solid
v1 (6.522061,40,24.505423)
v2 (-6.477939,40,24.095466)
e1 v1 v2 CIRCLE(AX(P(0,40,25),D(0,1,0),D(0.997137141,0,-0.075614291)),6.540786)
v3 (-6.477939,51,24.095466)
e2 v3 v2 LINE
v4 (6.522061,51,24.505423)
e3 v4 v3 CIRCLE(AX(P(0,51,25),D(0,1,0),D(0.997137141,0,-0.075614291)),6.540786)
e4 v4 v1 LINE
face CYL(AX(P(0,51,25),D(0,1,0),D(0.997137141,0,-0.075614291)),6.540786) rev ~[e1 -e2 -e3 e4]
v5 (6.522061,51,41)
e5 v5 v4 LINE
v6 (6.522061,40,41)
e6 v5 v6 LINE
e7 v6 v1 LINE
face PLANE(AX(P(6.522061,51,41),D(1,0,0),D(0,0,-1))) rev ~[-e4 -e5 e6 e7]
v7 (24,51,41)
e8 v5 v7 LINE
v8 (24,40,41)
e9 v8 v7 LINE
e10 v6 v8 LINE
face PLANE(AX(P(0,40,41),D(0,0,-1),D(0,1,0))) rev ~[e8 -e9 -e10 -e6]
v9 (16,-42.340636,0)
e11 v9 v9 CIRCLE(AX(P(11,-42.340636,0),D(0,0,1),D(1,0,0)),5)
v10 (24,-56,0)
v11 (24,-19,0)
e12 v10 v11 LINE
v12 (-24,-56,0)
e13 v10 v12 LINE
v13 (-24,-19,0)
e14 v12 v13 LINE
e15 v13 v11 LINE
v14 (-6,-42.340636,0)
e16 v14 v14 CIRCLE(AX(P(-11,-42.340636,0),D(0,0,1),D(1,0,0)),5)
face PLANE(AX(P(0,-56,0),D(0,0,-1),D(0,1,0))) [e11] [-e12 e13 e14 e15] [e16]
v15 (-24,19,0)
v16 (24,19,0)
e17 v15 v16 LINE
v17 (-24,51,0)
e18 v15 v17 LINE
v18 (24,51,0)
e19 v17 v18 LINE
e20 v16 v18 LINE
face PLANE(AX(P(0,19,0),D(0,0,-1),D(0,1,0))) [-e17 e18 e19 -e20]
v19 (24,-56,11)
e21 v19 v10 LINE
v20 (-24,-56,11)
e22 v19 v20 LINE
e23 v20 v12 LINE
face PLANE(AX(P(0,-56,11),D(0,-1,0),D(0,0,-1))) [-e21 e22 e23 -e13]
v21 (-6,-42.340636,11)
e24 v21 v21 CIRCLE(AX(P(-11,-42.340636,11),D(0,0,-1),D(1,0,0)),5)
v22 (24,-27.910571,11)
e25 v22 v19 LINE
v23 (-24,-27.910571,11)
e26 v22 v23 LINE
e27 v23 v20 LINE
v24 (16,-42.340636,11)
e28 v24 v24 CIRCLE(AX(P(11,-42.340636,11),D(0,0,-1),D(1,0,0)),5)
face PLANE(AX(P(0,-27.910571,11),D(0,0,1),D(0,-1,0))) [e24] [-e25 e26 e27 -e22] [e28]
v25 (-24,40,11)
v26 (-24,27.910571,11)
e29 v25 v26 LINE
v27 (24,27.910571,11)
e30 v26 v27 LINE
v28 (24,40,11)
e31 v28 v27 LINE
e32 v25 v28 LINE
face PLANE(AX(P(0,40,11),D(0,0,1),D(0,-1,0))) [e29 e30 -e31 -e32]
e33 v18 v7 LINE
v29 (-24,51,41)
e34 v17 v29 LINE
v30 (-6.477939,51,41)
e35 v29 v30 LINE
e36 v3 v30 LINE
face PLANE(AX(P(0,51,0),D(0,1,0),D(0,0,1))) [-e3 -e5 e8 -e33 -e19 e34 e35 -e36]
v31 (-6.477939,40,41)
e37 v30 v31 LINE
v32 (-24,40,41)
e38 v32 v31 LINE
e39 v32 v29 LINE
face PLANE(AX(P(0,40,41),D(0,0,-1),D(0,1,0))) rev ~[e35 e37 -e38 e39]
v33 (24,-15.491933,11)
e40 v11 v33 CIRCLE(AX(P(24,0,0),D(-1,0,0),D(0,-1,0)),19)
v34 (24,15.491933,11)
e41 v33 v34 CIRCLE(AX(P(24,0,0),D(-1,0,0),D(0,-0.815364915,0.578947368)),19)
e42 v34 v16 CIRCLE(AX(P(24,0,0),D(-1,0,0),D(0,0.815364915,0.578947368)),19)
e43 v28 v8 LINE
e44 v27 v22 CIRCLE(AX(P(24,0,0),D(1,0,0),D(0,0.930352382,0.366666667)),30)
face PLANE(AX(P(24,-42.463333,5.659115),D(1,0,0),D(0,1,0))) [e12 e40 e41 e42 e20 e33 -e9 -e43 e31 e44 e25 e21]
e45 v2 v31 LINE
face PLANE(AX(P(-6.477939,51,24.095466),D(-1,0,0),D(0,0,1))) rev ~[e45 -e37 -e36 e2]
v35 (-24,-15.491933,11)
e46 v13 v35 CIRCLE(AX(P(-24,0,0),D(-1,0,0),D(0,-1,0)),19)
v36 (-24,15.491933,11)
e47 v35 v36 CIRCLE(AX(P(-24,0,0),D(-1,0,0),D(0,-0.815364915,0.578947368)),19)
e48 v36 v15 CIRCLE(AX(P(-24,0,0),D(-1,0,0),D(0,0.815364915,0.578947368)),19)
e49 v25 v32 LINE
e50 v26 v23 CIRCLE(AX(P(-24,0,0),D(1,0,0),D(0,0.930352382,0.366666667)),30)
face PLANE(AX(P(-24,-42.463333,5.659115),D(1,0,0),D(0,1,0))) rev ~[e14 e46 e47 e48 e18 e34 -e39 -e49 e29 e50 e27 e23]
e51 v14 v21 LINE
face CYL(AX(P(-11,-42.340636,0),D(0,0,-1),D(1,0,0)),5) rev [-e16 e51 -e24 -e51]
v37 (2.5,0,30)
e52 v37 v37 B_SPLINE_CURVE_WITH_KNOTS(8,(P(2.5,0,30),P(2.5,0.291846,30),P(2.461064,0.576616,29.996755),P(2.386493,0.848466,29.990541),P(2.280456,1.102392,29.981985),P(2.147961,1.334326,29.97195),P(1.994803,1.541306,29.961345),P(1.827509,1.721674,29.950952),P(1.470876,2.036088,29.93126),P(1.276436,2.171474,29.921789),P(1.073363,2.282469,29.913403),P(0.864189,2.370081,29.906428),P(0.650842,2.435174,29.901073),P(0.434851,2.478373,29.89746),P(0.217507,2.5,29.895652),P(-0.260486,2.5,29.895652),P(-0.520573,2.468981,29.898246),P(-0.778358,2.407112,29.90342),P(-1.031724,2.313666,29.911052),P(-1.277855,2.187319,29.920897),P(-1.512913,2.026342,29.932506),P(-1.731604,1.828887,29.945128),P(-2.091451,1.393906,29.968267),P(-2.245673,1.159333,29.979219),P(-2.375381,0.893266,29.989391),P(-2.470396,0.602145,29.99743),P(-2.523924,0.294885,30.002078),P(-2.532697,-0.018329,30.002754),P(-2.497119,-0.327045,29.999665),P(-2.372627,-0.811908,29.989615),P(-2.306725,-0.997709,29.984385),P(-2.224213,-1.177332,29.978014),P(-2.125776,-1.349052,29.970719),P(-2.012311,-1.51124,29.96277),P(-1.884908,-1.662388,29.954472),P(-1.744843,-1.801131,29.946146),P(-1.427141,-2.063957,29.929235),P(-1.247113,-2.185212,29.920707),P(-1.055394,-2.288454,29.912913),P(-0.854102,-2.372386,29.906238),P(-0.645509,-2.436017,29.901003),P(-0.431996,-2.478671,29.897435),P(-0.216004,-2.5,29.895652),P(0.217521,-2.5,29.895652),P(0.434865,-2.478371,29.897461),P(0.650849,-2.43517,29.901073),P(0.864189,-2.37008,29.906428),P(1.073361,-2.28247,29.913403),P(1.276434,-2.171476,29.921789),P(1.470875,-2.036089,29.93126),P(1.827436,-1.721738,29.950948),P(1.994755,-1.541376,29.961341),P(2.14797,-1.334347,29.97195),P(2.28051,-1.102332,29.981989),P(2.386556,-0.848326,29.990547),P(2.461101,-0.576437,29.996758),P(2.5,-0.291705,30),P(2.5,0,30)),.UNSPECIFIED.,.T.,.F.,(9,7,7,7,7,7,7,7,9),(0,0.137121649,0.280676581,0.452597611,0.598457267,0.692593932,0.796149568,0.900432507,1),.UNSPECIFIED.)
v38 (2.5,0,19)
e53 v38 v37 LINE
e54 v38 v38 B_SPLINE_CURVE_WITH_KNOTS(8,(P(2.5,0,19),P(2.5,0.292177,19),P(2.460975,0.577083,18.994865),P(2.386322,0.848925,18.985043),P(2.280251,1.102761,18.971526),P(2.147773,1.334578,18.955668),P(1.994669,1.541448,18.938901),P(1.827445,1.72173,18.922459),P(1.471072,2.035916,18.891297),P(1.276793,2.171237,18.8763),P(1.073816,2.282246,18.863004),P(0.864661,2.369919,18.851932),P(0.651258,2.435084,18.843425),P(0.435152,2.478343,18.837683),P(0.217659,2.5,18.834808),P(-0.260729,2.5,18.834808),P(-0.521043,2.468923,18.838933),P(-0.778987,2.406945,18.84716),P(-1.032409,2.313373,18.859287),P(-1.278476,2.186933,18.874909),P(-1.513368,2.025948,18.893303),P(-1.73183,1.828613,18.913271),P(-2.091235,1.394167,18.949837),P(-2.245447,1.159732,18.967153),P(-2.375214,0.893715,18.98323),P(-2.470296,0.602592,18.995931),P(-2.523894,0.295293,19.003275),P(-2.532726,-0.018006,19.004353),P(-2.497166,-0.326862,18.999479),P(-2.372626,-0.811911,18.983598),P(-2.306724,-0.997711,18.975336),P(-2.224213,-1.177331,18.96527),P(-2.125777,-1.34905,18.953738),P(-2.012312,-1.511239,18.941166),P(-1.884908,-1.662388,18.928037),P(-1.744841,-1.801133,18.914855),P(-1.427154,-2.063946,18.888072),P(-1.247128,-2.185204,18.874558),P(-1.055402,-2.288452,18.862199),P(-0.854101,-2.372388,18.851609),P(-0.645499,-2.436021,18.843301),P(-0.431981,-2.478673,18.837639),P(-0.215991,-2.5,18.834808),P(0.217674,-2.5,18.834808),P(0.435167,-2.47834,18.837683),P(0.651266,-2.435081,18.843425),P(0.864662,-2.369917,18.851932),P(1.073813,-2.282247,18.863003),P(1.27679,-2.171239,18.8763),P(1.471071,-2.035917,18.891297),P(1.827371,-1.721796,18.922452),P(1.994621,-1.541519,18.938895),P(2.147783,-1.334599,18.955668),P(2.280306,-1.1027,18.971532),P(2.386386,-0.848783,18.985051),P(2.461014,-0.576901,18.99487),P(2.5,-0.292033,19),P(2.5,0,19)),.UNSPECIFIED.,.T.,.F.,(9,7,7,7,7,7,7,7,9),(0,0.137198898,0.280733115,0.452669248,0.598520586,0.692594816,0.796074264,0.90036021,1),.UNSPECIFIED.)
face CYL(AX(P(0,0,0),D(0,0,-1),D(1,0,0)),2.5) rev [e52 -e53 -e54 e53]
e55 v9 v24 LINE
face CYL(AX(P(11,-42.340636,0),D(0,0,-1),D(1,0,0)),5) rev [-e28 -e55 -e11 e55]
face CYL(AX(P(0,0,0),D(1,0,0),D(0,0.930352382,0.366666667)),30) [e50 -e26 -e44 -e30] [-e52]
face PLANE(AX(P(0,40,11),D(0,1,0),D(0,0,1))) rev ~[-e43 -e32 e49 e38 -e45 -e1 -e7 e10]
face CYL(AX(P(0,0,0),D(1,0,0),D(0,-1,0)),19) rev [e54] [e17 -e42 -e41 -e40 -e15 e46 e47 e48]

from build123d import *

# Parameters (mm, degrees)
F0_W     = 11
F0_H     = 30
F1_DEPTH = 24
F3_DEPTH = 11
F4_R     = 5
F4_R_2   = 2.5
F5_DEPTH = 41.001


with BuildPart() as f1:
    # F0 (on Right) → F1 (new body, symmetric)
    with BuildSketch(Plane.YZ):
        with BuildLine():
            Line((-56, 0), (-30, 0))
            ThreePointArc((-30, 0), (-29.4730143031, 5.5983415304), (-27.9105714739, 11))
            Line((-27.9105714739, 11), (-56, 11))
            Line((-56, 11), (-56, 0))
        make_face()
        with BuildLine():
            ThreePointArc((-27.9105714739, 11), (-29.4730143031, 5.5983415304), (-30, 0))
            Line((-30, 0), (-19, 0))
            ThreePointArc((-19, 0), (-18.1017503893, 5.7729223833), (-15.4919333848, 11))
            Line((-15.4919333848, 11), (-27.9105714739, 11))
        make_face()
        with BuildLine():
            Line((15.4919333848, 11), (27.9105714739, 11))
            ThreePointArc((27.9105714739, 11), (0, 30), (-27.9105714739, 11))
            Line((-27.9105714739, 11), (-15.4919333848, 11))
            ThreePointArc((-15.4919333848, 11), (0, 19), (15.4919333848, 11))
        make_face()
        with BuildLine():
            Line((19, 0), (30, 0))
            ThreePointArc((30, 0), (29.4730143031, 5.5983415304), (27.9105714739, 11))
            Line((27.9105714739, 11), (15.4919333848, 11))
            ThreePointArc((15.4919333848, 11), (18.1017503893, 5.7729223833), (19, 0))
        make_face()
        with BuildLine():
            ThreePointArc((27.9105714739, 11), (29.4730143031, 5.5983415304), (30, 0))
            Line((30, 0), (51, 0))
            Line((51, 0), (51, 11))
            Line((51, 11), (40, 11))
            Line((40, 11), (27.9105714739, 11))
        make_face()
        with Locations((45.5, 26)):
            Rectangle(F0_W, F0_H)
    extrude(amount=F1_DEPTH, both=True)

    # F2 (on face) → F3 (cut, through all)
    with BuildSketch(Plane(origin=(0, 51, 0), x_dir=(-1, 0, 0), z_dir=(0, 1, 0))):
        with BuildLine():
            Line((-6.5220605694, 25.4945768912), (-6.5220605694, 24.5054231088))
            ThreePointArc((-6.5220605694, 24.5054231088), (-0.2061620785, 18.4624639527), (6.4779394306, 24.0954663604))
            Line((6.4779394306, 24.0954663604), (6.4779394306, 25.9045336396))
            ThreePointArc((6.4779394306, 25.9045336396), (-0.2061620785, 31.5375360473), (-6.5220605694, 25.4945768912))
        make_face()
        with BuildLine():
            Line((-6.5220605694, 41), (-6.5220605694, 25.4945768912))
            ThreePointArc((-6.5220605694, 25.4945768912), (-0.2061620785, 31.5375360473), (6.4779394306, 25.9045336396))
            Line((6.4779394306, 25.9045336396), (6.4779394306, 41))
            Line((6.4779394306, 41), (-6.5220605694, 41))
        make_face()
    extrude(amount=-F3_DEPTH, mode=Mode.SUBTRACT)

    # F4 (on Top) → F5 (cut, through all)
    with BuildSketch(Plane.XY):
        with Locations((11, -42.3406362534)):
            Circle(F4_R)
        with Locations((-11, -42.3406362534)):
            Circle(F4_R)
        Circle(F4_R_2)
    extrude(amount=F5_DEPTH, mode=Mode.SUBTRACT)


solid = f1.part
